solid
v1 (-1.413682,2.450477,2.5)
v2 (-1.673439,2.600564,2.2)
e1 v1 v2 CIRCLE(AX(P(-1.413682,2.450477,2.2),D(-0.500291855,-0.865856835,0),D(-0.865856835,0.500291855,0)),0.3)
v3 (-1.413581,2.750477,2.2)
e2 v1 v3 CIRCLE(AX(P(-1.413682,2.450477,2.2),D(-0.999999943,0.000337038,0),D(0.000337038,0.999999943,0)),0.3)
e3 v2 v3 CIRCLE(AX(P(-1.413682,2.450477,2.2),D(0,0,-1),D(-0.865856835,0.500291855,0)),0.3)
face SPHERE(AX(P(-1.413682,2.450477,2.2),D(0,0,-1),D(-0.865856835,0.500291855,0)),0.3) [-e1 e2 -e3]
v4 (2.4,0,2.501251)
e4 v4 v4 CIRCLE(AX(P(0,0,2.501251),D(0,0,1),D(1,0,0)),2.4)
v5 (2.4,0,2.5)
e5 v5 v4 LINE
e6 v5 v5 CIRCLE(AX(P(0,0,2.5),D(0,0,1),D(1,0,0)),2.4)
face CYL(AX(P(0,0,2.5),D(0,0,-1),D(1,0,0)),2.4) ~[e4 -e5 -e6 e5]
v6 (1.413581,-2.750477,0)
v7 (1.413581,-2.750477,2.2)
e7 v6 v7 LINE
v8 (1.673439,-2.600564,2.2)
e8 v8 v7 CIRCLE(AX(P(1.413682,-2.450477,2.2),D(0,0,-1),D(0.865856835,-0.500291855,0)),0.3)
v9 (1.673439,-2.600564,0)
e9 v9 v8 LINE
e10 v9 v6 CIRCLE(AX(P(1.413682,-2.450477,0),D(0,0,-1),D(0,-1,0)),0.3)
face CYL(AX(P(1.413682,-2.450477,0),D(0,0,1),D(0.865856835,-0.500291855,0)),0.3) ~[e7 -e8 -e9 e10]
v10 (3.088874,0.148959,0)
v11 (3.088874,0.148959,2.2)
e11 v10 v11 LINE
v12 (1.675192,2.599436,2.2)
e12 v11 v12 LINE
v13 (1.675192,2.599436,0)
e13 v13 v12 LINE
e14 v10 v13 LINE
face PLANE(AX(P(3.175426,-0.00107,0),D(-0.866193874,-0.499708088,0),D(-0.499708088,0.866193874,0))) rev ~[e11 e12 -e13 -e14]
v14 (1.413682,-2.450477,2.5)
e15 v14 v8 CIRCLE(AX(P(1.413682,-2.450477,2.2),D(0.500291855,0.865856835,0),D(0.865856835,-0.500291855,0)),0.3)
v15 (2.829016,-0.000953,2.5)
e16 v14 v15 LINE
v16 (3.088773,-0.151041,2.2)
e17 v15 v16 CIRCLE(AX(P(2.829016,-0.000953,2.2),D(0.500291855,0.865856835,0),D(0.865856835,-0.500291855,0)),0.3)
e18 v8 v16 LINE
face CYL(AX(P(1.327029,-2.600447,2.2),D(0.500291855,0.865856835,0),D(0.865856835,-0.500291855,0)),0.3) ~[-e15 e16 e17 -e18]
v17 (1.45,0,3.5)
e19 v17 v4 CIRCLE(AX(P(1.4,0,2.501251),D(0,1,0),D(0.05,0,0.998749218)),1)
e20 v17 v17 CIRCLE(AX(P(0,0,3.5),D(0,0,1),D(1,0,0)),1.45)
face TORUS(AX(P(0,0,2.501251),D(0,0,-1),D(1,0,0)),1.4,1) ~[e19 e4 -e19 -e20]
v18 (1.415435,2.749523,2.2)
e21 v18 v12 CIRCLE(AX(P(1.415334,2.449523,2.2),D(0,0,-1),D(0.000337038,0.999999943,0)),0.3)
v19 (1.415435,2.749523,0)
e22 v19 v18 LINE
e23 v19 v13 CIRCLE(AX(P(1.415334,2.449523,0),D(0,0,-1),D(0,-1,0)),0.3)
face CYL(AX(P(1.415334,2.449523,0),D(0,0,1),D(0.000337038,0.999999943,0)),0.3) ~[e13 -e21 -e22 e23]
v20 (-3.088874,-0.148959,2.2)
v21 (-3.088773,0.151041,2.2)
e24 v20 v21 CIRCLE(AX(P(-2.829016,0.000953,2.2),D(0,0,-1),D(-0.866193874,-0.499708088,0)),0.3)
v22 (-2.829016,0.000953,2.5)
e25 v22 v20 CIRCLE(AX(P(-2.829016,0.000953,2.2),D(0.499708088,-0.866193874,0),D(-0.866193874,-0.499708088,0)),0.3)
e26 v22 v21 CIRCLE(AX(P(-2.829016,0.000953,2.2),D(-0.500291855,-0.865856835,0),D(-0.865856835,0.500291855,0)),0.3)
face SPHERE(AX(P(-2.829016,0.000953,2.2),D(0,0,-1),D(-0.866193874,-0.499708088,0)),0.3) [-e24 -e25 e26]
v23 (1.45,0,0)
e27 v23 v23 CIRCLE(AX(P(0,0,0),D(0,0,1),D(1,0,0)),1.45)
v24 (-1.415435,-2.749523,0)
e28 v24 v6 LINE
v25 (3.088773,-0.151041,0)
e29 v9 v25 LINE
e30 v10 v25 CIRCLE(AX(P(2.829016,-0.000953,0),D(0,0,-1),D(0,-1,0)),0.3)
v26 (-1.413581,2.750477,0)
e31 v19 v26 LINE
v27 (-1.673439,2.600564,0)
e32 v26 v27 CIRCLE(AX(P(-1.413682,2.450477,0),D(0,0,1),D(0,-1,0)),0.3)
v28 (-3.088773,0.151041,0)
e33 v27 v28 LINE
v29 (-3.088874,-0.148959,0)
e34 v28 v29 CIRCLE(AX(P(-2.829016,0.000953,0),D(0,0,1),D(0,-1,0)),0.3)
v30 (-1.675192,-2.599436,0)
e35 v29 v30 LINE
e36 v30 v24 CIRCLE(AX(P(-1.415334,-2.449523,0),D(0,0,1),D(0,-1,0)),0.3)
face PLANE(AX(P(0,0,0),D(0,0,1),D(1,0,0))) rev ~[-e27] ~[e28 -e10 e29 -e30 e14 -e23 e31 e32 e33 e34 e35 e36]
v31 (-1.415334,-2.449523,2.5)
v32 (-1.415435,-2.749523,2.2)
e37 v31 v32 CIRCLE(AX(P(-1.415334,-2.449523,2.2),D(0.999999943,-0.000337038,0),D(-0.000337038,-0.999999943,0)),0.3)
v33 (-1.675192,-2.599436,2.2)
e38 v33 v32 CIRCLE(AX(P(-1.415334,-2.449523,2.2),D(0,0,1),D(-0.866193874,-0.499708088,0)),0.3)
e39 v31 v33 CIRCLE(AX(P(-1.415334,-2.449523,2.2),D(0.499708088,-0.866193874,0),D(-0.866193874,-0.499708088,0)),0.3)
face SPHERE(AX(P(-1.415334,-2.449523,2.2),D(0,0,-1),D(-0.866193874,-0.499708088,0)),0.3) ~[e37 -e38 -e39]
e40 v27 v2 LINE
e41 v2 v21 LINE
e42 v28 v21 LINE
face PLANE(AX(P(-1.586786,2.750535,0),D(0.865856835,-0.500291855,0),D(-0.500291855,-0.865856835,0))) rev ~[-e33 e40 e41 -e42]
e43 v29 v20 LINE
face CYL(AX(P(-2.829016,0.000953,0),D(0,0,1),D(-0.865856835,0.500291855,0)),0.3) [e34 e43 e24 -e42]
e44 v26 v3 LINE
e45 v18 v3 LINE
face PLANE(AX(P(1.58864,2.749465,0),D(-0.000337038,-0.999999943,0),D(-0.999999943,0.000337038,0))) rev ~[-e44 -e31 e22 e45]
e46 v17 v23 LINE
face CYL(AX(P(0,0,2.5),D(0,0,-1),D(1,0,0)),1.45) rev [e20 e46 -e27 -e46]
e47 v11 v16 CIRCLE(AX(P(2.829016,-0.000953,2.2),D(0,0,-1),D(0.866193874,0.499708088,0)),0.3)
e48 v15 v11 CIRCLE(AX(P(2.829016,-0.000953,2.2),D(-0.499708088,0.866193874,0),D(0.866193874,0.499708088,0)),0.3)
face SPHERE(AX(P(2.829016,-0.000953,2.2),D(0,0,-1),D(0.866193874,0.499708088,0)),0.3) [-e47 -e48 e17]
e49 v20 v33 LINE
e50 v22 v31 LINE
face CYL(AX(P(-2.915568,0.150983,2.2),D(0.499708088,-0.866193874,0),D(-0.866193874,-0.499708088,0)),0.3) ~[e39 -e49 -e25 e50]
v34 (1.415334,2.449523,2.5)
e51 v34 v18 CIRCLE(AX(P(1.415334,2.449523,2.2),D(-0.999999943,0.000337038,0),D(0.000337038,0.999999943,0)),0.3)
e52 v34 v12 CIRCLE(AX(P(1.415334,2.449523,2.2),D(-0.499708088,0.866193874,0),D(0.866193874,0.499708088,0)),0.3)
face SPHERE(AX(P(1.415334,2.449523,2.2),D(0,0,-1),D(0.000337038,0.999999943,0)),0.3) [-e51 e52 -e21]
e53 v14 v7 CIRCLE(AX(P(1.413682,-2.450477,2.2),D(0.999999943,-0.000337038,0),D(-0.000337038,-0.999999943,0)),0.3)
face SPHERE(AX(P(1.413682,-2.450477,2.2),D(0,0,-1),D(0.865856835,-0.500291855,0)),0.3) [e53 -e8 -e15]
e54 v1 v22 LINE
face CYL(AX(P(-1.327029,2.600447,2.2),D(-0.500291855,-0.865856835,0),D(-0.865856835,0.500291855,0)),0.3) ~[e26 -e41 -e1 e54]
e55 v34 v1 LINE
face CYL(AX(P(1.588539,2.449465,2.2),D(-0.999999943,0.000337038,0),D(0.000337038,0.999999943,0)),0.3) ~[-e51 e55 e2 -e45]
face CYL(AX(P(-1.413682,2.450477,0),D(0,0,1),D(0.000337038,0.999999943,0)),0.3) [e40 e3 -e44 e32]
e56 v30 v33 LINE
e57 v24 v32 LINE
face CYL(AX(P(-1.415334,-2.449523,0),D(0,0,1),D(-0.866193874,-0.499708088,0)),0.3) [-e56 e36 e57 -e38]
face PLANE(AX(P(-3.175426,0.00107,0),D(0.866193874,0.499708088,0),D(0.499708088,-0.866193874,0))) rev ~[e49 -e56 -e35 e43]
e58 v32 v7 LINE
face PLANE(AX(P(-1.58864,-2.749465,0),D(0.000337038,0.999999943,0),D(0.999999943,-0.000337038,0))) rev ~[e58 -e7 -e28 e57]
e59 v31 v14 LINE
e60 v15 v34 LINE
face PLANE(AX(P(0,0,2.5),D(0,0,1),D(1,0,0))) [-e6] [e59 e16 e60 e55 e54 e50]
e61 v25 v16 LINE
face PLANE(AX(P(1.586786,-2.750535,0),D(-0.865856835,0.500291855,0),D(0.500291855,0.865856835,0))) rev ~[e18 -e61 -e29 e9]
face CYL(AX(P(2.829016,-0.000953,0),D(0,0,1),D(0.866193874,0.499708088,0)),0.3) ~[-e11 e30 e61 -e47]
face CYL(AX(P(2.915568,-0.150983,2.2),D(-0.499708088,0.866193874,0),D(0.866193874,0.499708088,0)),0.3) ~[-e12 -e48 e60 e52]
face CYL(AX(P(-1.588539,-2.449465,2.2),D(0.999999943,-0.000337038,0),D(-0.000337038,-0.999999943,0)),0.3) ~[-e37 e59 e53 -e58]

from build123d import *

# Parameters (mm, degrees)
F0_R     = 1.45
F1_DEPTH = 2.5
F3_R     = 2.4
F3_R_2   = 1.45
F4_DEPTH = 1
F5_R     = 0.3


# Not quite as in the source:
# - a fillet or chamfer that OpenCascade refuses, or shapes differently, is made with other operations: its cross-section is extruded or revolved along the edge and cut away or added


with BuildPart() as f1:
    # F0 (on Top) → F1 (new body)
    with BuildSketch(Plane.XY):
        Polygon((-1.5886400056, -2.7494647235), (1.5867862946, -2.7505349641), (3.1754263002, -0.0010702406), (1.5886400056, 2.7494647235), (-1.5867862946, 2.7505349641), (-3.1754263002, 0.0010702406), align=None)
        Circle(F0_R, mode=Mode.SUBTRACT)
    extrude(amount=F1_DEPTH)

    # F3 (on offset) → F4 (join)
    with BuildSketch(Plane.XY.offset(2.5)):
        Circle(F3_R)
        Circle(F3_R_2, mode=Mode.SUBTRACT)
    extrude(amount=F4_DEPTH)

    # F5
    f5_edges = [f1.edges().sort_by_distance(p)[0] for p in [
        (-2.382033, -1.374197, 2.5),
        (-2.381106, 1.375803, 2.5),
        (0.000927, 2.75, 2.5),
        (2.382033, 1.374197, 2.5),
        (2.381106, -1.375803, 2.5),
        (-0.000927, -2.75, 2.5),
        (3.175426, -0.00107, 1.25),
        (1.58864, 2.749465, 1.25),
        (-1.586786, 2.750535, 1.25),
        (-3.175426, 0.00107, 1.25),
        (-1.58864, -2.749465, 1.25),
        (1.586786, -2.750535, 1.25),
    ]]
    fillet(f5_edges, radius=F5_R)

    # F6: fillet of radius 1 on 1 edges, made by hand

    # F6_s1 → F6_t2 (revolve, cut)
    with BuildSketch(Plane.XZ):
        with BuildLine():
            ThreePointArc((1.45, 3.5), (2.1245688373, 3.1904532198), (2.4, 2.5012507822))
            Line((2.4, 2.5012507822), (2.4, 3.5))
            Line((2.4, 3.5), (1.45, 3.5))
        make_face()
    revolve(axis=Axis((0, 0, 3.5), (0, 0, 1)), mode=Mode.SUBTRACT)


solid = f1.part
